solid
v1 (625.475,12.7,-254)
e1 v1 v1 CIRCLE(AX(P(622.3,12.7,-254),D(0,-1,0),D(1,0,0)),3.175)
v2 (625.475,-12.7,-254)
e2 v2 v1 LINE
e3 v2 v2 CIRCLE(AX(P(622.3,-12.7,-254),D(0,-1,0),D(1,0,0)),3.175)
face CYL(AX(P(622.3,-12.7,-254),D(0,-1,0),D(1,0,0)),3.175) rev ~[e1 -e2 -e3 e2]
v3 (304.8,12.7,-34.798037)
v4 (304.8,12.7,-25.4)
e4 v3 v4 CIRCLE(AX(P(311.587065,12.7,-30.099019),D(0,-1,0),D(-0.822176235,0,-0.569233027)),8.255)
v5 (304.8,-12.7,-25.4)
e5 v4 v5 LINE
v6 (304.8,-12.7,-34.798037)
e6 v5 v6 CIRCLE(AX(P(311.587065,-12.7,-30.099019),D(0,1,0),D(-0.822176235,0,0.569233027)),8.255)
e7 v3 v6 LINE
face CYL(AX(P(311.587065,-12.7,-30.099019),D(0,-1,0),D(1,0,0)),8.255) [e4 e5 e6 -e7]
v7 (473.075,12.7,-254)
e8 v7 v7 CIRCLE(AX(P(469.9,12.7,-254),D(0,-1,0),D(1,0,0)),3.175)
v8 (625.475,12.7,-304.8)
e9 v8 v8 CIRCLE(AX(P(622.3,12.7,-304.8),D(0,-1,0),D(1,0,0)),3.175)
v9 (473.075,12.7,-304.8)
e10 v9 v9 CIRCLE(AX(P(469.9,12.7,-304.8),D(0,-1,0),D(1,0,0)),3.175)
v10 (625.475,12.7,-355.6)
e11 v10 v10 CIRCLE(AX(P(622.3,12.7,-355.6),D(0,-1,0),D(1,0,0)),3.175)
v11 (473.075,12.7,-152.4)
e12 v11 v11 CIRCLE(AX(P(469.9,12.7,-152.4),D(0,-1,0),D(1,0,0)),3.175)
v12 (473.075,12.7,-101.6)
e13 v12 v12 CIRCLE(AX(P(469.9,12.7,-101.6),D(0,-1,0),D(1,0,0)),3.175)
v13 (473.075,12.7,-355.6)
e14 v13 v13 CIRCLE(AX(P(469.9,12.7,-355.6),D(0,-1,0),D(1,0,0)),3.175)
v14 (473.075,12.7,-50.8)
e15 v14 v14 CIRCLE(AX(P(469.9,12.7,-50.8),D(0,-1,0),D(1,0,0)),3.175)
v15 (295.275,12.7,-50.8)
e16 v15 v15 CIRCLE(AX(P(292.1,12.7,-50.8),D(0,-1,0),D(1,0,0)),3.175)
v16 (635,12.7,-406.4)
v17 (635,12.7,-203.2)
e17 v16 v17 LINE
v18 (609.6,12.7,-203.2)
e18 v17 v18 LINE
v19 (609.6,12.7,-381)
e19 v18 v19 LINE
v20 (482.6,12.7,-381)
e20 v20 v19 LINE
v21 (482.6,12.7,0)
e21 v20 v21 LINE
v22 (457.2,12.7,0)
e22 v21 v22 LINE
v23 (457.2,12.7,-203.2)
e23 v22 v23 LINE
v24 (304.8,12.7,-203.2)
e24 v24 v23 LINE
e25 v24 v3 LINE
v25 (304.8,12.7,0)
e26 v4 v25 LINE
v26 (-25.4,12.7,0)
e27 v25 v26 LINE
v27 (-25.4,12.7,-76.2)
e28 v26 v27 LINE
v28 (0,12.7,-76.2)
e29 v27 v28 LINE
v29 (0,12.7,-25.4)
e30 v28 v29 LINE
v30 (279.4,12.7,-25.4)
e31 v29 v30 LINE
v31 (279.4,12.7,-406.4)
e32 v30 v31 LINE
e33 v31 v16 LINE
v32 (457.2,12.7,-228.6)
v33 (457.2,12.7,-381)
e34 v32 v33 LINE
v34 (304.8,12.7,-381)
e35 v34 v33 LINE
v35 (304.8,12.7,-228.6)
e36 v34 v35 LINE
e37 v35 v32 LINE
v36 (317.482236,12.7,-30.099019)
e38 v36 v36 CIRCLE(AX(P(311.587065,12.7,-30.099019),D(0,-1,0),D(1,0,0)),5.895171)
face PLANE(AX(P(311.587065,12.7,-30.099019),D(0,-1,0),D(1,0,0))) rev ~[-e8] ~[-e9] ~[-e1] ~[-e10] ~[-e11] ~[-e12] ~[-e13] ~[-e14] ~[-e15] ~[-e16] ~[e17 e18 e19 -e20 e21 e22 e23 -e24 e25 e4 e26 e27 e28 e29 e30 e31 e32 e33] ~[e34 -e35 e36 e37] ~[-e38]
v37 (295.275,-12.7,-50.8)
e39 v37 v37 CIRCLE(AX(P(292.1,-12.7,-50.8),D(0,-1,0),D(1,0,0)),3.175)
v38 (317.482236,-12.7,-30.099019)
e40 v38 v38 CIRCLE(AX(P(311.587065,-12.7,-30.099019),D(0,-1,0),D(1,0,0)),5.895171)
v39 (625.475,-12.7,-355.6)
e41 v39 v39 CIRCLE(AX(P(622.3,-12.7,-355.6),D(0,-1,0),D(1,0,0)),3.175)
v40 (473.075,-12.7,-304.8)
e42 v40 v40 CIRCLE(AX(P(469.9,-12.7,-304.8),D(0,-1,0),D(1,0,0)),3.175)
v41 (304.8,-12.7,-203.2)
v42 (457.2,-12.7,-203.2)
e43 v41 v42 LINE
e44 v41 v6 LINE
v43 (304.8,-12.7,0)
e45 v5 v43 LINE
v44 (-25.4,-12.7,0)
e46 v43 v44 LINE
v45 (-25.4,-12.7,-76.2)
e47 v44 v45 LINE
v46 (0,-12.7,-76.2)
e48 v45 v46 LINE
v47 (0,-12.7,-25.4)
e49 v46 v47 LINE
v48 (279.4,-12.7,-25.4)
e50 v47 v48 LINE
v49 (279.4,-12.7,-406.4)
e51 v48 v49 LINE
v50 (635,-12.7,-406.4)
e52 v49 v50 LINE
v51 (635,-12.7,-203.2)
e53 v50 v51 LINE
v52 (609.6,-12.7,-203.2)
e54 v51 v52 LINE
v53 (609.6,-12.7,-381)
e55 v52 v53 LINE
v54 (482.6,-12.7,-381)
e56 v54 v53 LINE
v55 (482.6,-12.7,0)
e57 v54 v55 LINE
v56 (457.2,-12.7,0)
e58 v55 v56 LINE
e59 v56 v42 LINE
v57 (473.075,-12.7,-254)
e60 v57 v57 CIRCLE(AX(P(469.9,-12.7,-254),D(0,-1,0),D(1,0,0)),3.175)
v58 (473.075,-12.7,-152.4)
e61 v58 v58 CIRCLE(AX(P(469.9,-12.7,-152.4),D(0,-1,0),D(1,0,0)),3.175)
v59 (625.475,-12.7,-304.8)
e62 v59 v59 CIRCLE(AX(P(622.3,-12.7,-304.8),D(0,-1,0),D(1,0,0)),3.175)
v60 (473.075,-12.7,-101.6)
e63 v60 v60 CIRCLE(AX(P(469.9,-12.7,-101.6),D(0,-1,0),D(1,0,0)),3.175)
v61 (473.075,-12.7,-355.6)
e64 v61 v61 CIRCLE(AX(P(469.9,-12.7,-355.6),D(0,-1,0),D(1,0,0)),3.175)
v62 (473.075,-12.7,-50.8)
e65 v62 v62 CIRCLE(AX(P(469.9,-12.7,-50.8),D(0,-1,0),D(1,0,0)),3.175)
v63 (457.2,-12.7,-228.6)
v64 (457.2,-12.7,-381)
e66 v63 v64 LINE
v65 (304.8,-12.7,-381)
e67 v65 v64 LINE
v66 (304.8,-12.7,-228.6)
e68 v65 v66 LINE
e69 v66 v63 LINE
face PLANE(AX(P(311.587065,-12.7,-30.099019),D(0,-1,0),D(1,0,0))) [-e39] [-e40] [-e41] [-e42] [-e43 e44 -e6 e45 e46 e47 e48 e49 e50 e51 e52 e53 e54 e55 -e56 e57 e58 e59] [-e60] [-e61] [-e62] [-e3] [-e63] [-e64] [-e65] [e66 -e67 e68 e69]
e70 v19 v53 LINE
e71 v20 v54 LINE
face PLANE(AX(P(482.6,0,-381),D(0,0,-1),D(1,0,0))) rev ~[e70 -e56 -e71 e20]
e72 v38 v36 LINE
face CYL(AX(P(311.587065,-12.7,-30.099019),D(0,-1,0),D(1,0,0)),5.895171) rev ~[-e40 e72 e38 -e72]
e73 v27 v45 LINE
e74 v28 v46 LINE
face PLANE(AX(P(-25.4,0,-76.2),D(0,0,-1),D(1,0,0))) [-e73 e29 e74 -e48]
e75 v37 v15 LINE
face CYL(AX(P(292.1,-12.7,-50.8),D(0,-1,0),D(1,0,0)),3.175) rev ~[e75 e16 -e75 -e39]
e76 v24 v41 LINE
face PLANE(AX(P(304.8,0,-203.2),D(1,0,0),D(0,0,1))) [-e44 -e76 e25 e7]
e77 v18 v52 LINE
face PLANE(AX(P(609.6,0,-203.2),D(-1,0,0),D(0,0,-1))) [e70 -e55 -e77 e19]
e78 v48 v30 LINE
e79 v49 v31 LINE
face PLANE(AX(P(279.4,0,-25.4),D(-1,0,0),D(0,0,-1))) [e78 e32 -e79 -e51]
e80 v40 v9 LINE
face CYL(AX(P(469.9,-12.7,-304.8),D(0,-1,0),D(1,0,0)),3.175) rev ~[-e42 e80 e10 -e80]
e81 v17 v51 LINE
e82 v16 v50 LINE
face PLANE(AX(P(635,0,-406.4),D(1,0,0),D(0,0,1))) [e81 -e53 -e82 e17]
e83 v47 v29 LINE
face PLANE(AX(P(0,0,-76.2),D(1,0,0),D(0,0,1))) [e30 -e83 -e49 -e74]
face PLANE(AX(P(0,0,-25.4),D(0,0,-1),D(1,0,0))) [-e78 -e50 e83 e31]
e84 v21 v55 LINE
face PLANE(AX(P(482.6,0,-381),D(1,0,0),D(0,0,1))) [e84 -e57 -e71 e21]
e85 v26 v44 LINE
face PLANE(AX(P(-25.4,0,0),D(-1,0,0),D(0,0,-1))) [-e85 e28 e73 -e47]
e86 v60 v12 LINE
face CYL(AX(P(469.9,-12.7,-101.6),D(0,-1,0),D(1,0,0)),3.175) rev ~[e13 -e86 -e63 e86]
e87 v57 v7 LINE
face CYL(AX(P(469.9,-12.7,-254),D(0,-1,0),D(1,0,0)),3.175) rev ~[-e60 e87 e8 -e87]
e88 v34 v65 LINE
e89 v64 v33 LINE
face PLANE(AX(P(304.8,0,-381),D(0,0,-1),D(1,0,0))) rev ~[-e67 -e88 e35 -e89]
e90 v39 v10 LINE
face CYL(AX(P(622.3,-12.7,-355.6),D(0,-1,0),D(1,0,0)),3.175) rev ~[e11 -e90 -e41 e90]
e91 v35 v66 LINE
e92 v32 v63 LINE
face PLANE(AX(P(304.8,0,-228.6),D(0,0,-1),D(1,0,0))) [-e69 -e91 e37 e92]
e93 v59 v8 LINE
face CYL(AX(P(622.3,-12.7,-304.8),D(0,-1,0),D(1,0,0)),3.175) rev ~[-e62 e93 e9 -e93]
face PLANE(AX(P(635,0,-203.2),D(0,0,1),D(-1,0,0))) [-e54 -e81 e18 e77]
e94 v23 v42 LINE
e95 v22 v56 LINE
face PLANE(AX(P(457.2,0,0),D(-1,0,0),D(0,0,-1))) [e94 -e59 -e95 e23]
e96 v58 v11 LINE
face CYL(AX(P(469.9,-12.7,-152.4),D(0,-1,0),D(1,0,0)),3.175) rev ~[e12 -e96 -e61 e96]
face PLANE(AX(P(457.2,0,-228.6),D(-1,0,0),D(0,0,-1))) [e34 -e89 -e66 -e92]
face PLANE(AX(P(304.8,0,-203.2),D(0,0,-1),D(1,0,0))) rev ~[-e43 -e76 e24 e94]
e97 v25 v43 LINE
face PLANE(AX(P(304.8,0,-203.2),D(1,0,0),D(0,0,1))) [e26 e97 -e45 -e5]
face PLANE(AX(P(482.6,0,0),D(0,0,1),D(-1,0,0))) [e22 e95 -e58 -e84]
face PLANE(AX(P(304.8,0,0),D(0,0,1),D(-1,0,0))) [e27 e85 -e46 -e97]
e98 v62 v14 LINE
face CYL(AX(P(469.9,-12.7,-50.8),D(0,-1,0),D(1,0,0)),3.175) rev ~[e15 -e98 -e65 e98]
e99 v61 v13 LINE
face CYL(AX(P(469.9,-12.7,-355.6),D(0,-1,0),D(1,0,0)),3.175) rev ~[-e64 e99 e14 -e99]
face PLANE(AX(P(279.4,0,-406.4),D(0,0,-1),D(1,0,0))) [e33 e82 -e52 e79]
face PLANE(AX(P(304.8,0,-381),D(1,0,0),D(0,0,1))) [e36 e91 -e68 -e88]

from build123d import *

# Parameters (mm, degrees)
F0_W      = 279.4
F0_H      = 25.4
F0_W_2    = 152.4
F0_W_3    = 25.4
F0_W_4    = 127
F1_DEPTH  = 12.7
F2_R      = 3.175
F3_DEPTH  = 50.8
F4_DEPTH  = 25.4
F5_R      = 8.255
F6_DEPTH  = 25.4
F9_R      = 5.8951712564
F10_DEPTH = 25.4


# Not quite as in the source:
# - the program builds the solid bodies; features that only make, move or delete a surface that nothing else refers to are left out


with BuildPart() as f1:
    # F0 (on Front) → F1 (new body, symmetric)
    with BuildSketch(Plane.XZ):
        with Locations((139.7, -12.7)):
            Rectangle(F0_W, F0_H)
        Polygon((0, -25.4), (0, 0), (-25.4, 0), (-25.4, -76.2), (0, -76.2), align=None)
        Polygon((304.8, 0), (279.4, 0), (279.4, -25.4), (279.4, -406.4), (304.8, -406.4), (304.8, -381), (304.8, -228.6), (304.8, -203.2), align=None)
        with Locations((381, -215.9)):
            Rectangle(F0_W_2, F0_H)
        with Locations((381, -393.7)):
            Rectangle(F0_W_2, F0_H)
        Polygon((457.2, 0), (457.2, -203.2), (457.2, -228.6), (457.2, -381), (482.6, -381), (482.6, 0), align=None)
        with Locations((469.9, -393.7)):
            Rectangle(F0_W_3, F0_H)
        with Locations((546.1, -393.7)):
            Rectangle(F0_W_4, F0_H)
        Polygon((609.6, -381), (609.6, -406.4), (635, -406.4), (635, -203.2), (609.6, -203.2), align=None)
    extrude(amount=F1_DEPTH, both=True)

    # F2 (on face) → F3 (cut)
    with BuildSketch(Plane.XZ.offset(12.7)):
        with Locations((469.9, -101.6)):
            Circle(F2_R)
        with Locations((469.9, -50.8)):
            Circle(F2_R)
        with Locations((469.9, -152.4)):
            Circle(F2_R)
        with Locations((469.9, -304.8)):
            Circle(F2_R)
        with Locations((469.9, -254)):
            Circle(F2_R)
        with Locations((469.9, -355.6)):
            Circle(F2_R)
        with Locations((622.3, -304.8)):
            Circle(F2_R)
        with Locations((622.3, -254)):
            Circle(F2_R)
        with Locations((622.3, -355.6)):
            Circle(F2_R)
        with Locations((292.1, -50.8)):
            Circle(F2_R)
    extrude(amount=F3_DEPTH, mode=Mode.SUBTRACT)

    # F2 (on face) → F4 (cut)
    with BuildSketch(Plane.XZ.offset(12.7)):
        with Locations((469.9, -101.6)):
            Circle(F2_R)
        with Locations((469.9, -50.8)):
            Circle(F2_R)
        with Locations((469.9, -152.4)):
            Circle(F2_R)
        with Locations((469.9, -304.8)):
            Circle(F2_R)
        with Locations((469.9, -254)):
            Circle(F2_R)
        with Locations((469.9, -355.6)):
            Circle(F2_R)
        with Locations((622.3, -304.8)):
            Circle(F2_R)
        with Locations((622.3, -254)):
            Circle(F2_R)
        with Locations((622.3, -355.6)):
            Circle(F2_R)
        with Locations((292.1, -50.8)):
            Circle(F2_R)
    extrude(amount=-F4_DEPTH, mode=Mode.SUBTRACT)

    # F5 (on face) → F6 (join)
    with BuildSketch(Plane.XZ.offset(12.7)):
        with Locations((311.5870648182, -30.0990186373)):
            Circle(F5_R)
    extrude(amount=-F6_DEPTH)

    # F9 (on face) → F10 (cut)
    with BuildSketch(Plane.XZ.offset(12.7)):
        with Locations((311.5870648182, -30.0990186373)):
            Circle(F9_R)
    extrude(amount=-F10_DEPTH, mode=Mode.SUBTRACT)


solid = f1.part
